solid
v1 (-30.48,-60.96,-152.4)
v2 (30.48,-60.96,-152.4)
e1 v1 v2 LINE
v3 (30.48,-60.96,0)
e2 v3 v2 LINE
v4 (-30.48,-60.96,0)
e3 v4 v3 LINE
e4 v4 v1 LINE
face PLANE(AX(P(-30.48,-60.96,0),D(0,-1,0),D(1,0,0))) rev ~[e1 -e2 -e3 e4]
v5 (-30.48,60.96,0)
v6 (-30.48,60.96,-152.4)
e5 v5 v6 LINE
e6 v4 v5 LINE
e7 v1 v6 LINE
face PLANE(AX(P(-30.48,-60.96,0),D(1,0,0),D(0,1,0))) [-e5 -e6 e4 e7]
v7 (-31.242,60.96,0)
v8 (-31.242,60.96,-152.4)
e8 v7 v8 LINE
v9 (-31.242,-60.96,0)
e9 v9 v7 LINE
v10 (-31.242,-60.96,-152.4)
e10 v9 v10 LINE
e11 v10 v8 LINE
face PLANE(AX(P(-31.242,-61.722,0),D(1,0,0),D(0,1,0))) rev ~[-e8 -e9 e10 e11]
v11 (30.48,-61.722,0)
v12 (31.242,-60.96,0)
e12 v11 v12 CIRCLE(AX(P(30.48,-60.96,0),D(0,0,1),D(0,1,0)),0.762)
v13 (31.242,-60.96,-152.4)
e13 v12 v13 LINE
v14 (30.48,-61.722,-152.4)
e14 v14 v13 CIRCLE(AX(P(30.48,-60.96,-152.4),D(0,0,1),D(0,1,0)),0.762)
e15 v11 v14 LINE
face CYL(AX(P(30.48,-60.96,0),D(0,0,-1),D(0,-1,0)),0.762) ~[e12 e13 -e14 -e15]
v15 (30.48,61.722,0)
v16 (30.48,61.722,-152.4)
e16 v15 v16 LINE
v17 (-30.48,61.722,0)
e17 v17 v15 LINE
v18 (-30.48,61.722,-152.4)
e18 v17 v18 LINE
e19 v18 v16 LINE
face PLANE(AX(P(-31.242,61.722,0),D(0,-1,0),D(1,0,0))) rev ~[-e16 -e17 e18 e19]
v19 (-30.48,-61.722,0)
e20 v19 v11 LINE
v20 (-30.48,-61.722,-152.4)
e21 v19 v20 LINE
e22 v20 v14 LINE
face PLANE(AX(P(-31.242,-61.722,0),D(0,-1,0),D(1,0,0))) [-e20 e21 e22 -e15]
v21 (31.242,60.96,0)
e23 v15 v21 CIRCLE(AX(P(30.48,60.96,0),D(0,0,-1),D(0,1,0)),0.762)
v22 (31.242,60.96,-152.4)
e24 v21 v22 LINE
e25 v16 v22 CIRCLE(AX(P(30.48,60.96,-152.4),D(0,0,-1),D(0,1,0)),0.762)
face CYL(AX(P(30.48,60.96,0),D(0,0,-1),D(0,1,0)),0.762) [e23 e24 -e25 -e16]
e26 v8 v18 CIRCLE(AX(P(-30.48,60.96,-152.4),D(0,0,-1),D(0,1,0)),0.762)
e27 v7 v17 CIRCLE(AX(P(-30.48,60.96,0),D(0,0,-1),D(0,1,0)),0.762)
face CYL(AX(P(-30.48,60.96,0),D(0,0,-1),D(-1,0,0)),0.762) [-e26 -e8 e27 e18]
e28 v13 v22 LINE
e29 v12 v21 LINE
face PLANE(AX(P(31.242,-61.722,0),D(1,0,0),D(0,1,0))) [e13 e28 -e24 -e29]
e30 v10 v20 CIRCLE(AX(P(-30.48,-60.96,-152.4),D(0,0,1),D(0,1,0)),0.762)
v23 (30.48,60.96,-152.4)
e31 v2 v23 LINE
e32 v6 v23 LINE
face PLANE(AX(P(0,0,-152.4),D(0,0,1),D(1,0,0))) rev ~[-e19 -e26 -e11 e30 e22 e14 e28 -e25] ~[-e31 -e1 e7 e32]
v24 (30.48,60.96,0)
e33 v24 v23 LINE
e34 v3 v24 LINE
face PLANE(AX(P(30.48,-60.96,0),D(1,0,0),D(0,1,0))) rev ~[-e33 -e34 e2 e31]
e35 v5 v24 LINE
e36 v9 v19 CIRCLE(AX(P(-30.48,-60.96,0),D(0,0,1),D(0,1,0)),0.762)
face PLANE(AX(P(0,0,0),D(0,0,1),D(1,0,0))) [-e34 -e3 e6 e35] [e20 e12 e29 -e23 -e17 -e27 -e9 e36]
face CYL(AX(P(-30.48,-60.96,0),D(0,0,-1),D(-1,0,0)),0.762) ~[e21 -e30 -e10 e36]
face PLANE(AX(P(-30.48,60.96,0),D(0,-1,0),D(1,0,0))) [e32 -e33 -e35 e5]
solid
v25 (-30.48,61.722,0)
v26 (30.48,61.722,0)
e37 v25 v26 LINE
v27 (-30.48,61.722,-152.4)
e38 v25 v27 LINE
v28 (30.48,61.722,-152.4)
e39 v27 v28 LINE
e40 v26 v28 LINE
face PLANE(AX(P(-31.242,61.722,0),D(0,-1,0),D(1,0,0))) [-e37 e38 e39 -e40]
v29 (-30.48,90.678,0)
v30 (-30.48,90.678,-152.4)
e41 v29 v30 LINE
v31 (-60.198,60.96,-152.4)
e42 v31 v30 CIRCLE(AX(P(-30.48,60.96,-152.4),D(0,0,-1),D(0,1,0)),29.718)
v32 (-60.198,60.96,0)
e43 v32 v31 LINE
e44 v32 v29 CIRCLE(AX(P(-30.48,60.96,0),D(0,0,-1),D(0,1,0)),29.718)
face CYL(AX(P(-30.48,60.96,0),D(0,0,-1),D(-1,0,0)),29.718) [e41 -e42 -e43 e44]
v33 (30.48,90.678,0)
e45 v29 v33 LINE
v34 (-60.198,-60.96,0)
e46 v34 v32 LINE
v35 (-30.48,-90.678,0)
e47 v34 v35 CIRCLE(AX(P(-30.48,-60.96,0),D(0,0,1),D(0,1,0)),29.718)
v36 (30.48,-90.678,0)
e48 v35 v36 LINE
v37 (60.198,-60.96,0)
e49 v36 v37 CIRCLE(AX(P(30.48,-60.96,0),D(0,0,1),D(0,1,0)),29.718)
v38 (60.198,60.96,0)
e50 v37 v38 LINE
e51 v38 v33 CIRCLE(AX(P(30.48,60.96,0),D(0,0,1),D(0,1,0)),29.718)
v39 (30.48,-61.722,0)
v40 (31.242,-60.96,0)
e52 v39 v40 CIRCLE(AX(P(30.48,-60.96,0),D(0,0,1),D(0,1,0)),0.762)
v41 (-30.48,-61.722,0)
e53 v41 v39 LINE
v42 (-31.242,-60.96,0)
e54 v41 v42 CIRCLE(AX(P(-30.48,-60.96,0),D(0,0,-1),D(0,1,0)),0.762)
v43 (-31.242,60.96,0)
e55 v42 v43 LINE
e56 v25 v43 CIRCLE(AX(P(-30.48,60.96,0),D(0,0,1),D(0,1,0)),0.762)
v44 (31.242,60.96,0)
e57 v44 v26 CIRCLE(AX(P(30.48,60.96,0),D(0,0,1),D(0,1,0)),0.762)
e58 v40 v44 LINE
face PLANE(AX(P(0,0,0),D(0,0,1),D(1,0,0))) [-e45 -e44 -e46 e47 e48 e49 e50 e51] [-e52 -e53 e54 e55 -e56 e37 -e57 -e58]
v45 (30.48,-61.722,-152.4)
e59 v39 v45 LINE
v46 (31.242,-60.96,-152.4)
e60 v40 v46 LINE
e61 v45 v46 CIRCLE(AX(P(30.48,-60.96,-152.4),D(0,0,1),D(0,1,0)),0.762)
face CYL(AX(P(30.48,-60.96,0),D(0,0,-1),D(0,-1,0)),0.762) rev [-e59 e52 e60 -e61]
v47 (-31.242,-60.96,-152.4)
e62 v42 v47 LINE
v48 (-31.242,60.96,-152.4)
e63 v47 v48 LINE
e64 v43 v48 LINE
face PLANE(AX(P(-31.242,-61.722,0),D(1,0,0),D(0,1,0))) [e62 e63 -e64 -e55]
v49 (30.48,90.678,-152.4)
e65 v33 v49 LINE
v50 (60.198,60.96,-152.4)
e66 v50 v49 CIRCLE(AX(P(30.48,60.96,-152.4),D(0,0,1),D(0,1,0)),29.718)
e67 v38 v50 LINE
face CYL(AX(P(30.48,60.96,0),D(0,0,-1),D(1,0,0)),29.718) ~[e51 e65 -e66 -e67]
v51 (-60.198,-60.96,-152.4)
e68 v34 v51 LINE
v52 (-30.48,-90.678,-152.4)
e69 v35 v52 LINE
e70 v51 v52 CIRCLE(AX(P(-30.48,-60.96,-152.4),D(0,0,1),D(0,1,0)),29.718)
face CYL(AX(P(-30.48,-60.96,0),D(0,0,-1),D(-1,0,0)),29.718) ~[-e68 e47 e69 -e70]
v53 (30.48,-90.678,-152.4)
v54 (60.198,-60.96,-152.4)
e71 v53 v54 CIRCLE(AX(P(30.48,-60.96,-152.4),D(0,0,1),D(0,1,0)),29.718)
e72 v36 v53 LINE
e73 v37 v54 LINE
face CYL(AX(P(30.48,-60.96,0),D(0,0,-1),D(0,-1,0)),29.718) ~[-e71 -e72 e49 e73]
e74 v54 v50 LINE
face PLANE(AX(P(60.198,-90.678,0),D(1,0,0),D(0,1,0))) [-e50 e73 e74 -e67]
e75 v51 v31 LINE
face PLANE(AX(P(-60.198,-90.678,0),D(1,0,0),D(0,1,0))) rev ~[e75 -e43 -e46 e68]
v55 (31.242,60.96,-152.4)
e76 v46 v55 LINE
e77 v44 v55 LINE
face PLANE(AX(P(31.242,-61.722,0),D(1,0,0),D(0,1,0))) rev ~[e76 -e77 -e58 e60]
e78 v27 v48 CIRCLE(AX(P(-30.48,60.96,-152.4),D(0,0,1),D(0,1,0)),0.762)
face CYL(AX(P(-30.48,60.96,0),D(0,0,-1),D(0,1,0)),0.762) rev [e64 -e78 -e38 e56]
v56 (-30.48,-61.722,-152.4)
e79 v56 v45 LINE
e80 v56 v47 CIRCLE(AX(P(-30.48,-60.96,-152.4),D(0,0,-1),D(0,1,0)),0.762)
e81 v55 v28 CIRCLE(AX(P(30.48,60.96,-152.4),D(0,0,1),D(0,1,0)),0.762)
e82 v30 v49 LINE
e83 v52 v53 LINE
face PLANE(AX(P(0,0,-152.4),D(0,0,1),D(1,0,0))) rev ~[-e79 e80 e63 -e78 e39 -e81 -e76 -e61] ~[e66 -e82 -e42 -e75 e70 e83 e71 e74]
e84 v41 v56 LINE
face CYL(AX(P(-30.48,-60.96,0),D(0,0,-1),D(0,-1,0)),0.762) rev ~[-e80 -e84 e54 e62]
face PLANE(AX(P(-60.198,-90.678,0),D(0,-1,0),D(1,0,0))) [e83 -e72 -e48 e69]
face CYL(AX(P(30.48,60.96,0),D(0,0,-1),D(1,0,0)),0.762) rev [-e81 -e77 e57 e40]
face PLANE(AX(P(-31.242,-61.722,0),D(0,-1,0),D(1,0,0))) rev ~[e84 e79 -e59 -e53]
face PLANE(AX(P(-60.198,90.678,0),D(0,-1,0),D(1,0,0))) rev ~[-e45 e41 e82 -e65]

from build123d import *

# Parameters (mm, degrees)
F4_W      = 120.396
F4_H      = 181.356
F5_DEPTH  = 152.4
F6_R      = 29.718
F7_W      = 62.484
F7_H      = 123.444
F8_DEPTH  = 152.4
F9_W      = 62.484
F9_H      = 123.444
F10_DEPTH = 152.4
F11_W     = 60.96
F11_H     = 121.92
F12_DEPTH = 152.4
F13_R     = 0.762
F14_R     = 0.762


with BuildPart() as f5:
    # F4 (on Top) → F5 (new body)
    with BuildSketch(Plane.XY):
        Rectangle(F4_W, F4_H)
    extrude(amount=-F5_DEPTH)

    # F6
    f6_edges = [f5.edges().sort_by_distance(p)[0] for p in [
        (-60.198, 90.678, -76.2),
        (60.198, 90.678, -76.2),
        (60.198, -90.678, -76.2),
        (-60.198, -90.678, -76.2),
    ]]
    fillet(f6_edges, radius=F6_R)

    # F7 (on face) → F8 (cut)
    with BuildSketch(Plane.XY):
        Rectangle(F7_W, F7_H)
    extrude(amount=-F8_DEPTH, mode=Mode.SUBTRACT)

    # F14
    f14_edges = [f5.edges().sort_by_distance(p)[0] for p in [
        (-31.242, 61.722, -76.2),
        (-31.242, -61.722, -76.2),
        (31.242, -61.722, -76.2),
        (31.242, 61.722, -76.2),
    ]]
    fillet(f14_edges, radius=F14_R)


with BuildPart() as f10:
    # F9 (on face) → F10 (new body)
    with BuildSketch(Plane.XY):
        Rectangle(F9_W, F9_H)
    extrude(amount=-F10_DEPTH)

    # F11 (on face) → F12 (cut)
    with BuildSketch(Plane.XY):
        Rectangle(F11_W, F11_H)
    extrude(amount=-F12_DEPTH, mode=Mode.SUBTRACT)

    # F13
    f13_edges = [f10.edges().sort_by_distance(p)[0] for p in [
        (-31.242, 61.722, -76.2),
        (31.242, 61.722, -76.2),
        (31.242, -61.722, -76.2),
        (-31.242, -61.722, -76.2),
    ]]
    fillet(f13_edges, radius=F13_R)


solid = Compound([f5.part, f10.part])
